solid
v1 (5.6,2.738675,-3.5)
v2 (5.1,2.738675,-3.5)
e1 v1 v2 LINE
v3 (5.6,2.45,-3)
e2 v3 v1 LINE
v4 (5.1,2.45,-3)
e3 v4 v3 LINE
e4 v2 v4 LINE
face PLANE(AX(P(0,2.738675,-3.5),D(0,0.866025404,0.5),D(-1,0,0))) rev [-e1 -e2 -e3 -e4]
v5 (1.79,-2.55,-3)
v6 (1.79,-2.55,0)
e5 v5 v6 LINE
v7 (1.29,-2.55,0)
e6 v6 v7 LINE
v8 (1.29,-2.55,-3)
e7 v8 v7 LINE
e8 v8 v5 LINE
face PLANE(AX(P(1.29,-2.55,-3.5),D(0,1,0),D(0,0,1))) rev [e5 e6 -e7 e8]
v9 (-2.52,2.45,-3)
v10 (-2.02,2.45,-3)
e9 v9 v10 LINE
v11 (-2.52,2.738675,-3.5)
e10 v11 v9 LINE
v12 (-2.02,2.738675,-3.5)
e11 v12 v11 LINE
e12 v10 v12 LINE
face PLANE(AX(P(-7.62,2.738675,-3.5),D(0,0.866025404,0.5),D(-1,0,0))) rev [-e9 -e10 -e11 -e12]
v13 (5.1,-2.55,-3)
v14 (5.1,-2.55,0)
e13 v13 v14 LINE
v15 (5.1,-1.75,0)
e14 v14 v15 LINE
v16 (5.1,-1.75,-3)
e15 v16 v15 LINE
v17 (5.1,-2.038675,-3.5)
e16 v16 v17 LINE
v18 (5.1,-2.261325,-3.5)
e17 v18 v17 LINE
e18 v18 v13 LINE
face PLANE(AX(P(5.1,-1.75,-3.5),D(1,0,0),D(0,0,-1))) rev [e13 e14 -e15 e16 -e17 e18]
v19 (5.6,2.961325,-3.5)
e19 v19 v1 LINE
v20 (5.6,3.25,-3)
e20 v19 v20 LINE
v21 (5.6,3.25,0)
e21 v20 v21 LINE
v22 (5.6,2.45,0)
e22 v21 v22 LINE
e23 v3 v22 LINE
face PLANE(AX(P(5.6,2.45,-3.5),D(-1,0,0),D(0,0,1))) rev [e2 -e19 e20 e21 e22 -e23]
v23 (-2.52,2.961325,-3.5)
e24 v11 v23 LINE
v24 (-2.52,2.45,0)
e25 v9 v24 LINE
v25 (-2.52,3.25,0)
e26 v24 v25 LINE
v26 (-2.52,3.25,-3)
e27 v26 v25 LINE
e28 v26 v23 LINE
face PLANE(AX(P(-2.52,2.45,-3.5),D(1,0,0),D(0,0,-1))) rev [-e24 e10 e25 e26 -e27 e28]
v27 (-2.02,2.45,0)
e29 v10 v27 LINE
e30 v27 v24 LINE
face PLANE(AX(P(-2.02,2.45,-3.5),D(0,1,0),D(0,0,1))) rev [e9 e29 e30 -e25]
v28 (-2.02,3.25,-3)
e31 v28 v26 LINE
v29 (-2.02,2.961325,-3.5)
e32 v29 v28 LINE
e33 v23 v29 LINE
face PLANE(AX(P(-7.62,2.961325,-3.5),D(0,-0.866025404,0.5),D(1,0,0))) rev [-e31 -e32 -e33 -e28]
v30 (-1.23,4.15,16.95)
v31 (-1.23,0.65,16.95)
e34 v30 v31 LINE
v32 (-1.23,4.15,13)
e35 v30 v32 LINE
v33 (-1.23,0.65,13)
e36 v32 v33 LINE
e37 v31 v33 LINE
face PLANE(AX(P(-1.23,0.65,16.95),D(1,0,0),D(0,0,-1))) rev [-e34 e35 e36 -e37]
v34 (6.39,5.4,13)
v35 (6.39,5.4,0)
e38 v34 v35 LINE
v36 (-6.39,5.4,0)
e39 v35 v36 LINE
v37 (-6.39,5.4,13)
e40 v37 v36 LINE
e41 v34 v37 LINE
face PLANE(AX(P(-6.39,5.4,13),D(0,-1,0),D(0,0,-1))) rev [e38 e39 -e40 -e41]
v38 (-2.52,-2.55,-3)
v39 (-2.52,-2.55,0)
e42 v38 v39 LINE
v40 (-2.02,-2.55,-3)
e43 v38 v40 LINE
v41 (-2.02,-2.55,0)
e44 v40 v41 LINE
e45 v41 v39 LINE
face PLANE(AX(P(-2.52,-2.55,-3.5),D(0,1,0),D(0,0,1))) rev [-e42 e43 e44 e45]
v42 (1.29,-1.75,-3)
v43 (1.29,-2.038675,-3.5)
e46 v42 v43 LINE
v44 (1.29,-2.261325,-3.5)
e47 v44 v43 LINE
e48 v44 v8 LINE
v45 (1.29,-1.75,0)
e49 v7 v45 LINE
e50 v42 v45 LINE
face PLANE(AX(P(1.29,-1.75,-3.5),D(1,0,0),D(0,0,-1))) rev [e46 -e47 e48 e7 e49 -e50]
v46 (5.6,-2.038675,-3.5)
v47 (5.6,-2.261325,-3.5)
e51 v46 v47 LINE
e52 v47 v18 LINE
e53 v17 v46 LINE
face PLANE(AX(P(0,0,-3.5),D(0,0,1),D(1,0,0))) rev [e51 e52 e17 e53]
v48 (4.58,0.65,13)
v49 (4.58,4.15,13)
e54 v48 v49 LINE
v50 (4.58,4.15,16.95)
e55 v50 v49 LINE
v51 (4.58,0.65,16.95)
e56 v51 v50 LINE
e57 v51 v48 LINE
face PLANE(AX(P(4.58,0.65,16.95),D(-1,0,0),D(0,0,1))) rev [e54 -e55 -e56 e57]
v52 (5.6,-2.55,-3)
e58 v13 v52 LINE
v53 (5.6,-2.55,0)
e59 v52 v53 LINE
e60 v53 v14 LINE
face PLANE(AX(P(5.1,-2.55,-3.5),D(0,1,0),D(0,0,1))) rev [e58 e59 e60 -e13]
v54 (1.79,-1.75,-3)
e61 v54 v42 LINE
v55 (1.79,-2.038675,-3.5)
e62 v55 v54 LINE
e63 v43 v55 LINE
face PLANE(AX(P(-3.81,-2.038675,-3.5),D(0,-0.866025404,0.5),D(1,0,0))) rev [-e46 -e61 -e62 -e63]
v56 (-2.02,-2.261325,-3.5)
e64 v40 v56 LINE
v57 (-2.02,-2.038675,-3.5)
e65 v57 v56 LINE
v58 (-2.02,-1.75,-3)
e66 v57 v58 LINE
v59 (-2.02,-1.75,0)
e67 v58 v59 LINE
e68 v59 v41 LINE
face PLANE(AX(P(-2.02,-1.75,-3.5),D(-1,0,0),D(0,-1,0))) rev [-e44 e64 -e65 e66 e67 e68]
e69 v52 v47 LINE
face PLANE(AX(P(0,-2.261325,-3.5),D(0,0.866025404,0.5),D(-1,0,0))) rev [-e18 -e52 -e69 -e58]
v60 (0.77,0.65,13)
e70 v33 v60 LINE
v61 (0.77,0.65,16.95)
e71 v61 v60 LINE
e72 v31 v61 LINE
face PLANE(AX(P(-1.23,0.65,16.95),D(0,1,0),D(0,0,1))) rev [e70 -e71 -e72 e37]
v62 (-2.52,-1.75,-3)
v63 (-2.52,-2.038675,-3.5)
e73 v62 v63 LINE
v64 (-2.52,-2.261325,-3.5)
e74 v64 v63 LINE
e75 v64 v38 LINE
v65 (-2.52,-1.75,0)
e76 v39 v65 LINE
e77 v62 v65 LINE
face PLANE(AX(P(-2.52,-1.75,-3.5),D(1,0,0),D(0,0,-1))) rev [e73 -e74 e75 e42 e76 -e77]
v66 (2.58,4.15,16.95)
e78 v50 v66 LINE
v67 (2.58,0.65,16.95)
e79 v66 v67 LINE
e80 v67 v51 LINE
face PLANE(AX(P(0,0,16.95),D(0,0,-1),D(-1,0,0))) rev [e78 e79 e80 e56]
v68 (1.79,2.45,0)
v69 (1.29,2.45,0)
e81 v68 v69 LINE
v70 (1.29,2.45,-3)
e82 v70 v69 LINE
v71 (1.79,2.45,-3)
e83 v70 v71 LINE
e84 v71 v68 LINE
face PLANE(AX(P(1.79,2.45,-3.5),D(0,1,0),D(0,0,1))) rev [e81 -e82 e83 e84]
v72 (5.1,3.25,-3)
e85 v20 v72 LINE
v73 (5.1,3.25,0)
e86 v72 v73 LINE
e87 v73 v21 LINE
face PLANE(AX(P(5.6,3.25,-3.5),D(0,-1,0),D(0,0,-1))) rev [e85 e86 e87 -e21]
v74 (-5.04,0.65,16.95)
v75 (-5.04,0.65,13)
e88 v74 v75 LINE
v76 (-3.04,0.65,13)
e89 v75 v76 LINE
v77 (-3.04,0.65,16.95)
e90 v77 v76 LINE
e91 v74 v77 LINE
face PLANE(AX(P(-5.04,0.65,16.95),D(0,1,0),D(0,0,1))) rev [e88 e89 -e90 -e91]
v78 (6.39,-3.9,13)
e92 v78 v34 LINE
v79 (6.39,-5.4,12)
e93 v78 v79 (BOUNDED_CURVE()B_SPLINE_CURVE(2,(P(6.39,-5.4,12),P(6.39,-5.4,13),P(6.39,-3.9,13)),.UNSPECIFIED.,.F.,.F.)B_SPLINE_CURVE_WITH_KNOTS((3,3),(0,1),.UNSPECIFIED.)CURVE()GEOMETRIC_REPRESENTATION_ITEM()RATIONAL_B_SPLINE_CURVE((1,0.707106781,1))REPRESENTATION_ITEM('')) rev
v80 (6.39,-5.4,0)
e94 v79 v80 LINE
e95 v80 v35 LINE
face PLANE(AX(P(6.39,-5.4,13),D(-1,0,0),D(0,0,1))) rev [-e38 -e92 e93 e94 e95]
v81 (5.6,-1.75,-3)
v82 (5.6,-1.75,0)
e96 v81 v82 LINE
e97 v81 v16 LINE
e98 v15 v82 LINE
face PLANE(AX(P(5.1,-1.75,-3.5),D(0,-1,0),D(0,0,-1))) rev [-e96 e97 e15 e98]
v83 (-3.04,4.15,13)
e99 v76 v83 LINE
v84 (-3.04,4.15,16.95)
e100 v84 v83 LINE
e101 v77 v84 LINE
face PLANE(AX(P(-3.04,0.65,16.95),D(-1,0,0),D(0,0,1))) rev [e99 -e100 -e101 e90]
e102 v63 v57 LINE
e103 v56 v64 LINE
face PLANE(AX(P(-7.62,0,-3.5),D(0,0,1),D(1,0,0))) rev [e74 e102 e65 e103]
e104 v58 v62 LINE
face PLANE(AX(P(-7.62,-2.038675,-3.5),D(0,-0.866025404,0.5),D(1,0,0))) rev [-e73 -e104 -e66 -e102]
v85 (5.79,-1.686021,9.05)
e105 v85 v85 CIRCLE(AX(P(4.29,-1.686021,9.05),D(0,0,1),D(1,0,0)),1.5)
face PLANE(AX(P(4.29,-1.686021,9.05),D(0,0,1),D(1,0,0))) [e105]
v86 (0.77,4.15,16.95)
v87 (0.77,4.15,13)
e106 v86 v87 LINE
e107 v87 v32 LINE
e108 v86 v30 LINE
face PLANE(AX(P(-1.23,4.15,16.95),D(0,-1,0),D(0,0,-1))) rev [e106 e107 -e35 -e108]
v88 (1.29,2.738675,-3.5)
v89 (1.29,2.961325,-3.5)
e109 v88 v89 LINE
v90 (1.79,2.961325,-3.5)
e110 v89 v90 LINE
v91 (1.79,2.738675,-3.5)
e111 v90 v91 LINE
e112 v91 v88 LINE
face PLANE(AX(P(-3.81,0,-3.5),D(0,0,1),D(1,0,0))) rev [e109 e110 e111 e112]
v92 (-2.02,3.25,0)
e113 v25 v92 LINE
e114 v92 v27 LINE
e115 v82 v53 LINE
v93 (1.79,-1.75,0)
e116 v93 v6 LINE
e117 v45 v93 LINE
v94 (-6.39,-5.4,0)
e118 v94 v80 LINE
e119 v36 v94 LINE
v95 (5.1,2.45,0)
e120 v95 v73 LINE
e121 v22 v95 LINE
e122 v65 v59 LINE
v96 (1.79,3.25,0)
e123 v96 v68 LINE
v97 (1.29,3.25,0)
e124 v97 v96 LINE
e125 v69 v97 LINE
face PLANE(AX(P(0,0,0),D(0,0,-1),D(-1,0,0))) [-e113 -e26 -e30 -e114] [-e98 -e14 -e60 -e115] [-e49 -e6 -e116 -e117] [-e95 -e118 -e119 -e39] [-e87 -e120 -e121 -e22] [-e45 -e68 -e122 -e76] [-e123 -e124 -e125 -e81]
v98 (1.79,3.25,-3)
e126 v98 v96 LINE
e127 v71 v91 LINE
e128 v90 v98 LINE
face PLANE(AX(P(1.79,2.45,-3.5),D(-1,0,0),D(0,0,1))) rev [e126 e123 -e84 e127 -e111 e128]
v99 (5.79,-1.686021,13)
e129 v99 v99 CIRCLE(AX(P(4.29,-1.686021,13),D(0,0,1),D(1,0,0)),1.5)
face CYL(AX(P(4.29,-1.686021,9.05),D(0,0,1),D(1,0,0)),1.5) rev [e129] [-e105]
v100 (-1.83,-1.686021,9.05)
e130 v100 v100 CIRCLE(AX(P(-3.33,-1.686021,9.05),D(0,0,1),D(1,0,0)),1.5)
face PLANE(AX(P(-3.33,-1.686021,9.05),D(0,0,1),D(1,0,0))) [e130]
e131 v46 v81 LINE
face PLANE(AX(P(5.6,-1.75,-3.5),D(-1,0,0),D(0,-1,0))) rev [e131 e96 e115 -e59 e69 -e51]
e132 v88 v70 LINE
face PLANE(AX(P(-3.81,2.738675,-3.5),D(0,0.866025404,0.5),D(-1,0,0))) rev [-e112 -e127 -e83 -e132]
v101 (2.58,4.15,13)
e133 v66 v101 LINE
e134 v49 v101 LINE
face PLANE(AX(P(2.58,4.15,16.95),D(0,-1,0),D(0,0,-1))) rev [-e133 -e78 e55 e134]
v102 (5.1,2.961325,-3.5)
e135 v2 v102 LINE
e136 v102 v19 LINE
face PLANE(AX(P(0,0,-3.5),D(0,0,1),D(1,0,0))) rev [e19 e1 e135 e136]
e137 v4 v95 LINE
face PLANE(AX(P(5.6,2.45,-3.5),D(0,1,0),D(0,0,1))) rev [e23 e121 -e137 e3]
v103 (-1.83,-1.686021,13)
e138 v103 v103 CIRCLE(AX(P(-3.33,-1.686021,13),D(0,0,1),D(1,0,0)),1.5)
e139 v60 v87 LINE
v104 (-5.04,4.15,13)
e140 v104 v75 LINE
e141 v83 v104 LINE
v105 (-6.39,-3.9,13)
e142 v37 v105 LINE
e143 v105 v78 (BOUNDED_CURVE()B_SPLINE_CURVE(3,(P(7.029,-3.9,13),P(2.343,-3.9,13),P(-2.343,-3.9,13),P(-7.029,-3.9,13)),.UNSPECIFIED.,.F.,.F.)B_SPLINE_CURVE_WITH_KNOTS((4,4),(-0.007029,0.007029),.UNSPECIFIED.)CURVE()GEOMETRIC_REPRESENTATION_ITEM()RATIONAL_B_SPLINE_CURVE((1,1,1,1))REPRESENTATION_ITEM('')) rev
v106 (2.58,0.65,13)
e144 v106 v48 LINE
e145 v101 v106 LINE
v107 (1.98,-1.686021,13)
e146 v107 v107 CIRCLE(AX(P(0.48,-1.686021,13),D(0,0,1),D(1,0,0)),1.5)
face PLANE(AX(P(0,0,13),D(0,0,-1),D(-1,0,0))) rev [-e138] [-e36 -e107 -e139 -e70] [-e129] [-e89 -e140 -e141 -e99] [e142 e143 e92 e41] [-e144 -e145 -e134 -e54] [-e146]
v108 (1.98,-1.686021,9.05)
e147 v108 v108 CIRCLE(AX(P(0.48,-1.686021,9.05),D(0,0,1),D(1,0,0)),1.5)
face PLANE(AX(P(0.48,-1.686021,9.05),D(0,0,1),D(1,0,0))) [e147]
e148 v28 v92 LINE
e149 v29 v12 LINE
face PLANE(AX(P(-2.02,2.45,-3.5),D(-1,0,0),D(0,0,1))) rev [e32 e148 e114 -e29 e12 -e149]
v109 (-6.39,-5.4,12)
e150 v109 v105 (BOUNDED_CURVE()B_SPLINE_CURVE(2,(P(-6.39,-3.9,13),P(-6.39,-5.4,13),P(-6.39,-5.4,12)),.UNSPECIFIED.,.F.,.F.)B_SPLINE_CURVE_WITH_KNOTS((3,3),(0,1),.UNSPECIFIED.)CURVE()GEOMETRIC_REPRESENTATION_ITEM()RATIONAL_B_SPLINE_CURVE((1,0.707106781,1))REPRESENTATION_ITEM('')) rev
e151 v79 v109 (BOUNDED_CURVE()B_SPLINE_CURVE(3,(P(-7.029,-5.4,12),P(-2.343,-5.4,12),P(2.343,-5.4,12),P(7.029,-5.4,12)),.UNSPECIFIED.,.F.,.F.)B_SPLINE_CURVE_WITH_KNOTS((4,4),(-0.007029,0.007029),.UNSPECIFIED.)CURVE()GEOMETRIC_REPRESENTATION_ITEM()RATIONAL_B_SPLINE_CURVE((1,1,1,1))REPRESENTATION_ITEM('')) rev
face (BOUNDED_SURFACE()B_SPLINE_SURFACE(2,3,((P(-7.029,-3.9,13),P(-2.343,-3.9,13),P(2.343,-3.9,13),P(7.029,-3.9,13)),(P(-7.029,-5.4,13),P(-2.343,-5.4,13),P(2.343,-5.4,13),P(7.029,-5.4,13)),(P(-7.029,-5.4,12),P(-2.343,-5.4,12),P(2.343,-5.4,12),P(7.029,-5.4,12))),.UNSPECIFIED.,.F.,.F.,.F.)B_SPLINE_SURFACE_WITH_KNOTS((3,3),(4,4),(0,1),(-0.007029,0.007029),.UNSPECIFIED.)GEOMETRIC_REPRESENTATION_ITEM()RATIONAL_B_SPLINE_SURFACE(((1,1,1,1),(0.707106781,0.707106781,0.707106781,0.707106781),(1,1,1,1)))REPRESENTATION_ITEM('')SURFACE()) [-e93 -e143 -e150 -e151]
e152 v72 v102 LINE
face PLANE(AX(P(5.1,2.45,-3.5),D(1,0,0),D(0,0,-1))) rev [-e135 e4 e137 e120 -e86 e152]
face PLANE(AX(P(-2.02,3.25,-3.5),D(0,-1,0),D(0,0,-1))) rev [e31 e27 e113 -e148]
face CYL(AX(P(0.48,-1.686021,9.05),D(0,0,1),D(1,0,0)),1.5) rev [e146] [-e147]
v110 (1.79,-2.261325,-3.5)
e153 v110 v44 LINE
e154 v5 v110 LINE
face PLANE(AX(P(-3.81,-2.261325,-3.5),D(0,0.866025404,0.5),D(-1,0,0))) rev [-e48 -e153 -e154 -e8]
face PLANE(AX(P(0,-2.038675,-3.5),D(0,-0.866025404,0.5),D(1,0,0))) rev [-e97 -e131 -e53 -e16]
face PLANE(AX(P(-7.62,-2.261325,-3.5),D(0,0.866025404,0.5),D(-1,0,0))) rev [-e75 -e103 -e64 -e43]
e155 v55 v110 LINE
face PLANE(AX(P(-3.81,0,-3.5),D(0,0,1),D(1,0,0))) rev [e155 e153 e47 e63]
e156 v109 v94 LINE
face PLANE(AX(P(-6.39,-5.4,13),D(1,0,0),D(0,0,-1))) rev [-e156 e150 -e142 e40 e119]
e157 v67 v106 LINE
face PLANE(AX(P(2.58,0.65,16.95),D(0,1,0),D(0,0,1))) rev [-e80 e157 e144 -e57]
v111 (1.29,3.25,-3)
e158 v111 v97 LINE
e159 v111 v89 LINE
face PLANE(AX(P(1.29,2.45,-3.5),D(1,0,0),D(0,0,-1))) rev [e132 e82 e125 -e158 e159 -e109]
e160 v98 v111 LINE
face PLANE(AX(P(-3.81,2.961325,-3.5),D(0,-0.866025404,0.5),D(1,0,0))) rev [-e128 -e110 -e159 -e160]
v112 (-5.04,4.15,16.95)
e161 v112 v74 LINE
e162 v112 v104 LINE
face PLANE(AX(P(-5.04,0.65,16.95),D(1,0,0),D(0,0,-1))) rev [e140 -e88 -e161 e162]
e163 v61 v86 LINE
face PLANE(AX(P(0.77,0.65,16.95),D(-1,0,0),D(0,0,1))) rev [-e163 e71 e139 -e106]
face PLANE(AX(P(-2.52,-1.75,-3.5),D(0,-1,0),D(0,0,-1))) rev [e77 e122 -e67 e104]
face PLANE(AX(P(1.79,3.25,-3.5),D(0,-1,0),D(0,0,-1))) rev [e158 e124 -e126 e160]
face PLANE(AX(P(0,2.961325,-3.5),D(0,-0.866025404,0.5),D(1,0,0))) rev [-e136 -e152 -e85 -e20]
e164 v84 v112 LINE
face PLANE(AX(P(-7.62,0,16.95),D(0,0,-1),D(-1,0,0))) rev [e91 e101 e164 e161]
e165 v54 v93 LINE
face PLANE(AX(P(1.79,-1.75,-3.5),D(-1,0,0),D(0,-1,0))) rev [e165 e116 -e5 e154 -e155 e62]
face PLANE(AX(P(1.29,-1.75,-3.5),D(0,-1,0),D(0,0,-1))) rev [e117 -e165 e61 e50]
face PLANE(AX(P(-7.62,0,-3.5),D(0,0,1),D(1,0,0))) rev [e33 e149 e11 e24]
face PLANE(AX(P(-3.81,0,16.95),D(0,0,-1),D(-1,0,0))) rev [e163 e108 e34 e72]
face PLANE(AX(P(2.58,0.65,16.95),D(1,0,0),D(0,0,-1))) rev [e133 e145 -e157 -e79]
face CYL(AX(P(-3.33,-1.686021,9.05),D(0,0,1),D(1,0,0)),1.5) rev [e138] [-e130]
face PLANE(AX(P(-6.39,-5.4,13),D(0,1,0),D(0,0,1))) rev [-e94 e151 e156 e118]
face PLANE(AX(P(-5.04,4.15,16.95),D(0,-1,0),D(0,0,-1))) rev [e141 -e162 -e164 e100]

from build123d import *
from OCP.BRepFilletAPI import BRepFilletAPI_MakeChamfer

# Parameters (mm, degrees)
SKETCH_1_W                          = 12.78
SKETCH_1_H                          = 10.8
EXTRUDE_1_DEPTH                     = 13
FILLET_1_SIZE                       = 1
FILLET_1_SIZE_2                     = 1.5
SKETCH_2_W                          = 2
SKETCH_2_H                          = 3.5
EXTRUDE_2_DEPTH                     = 3.95
SKETCH_3_R                          = 1.5
CUT_EXTRUDE_1_DEPTH                 = 3.95
SKETCH_4_W                          = 0.5
SKETCH_4_H                          = 0.8
EXTRUDE_3_DEPTH                     = 3.5
CHAMFER_1_SIZE                      = 0.5
CHAMFER_1_SIZE2                     = 0.288675135
PATTERN_LINEAR_2_COUNT              = 3
PATTERN_LINEAR_2_PITCH              = 3.81
CHAMFER_1_OF_PATTERN_LINEAR_2_SIZE  = 0.5
CHAMFER_1_OF_PATTERN_LINEAR_2_SIZE2 = 0.288675135


with BuildPart() as part:
    # Эскиз1 → Бобышка-Вытянуть1 (new body)
    with BuildSketch(Plane.XY):
        Rectangle(SKETCH_1_W, SKETCH_1_H)
    extrude(amount=EXTRUDE_1_DEPTH)

    # Скругление1
    # an asymmetric fillet: 1.5, 1 mm, written as the material it takes off along each edge
    with BuildSketch(Plane(origin=(-10.14, -5.4, 13), x_dir=(0, 0, -1), z_dir=(1, 0, 0))) as fillet_1_piece_1:
        with BuildLine():
            Bezier((FILLET_1_SIZE, 0), (0, 0), (0, FILLET_1_SIZE_2), weights=[1, 0.707106781, 1])
            Line((0, FILLET_1_SIZE_2), (0, 0))
            Line((0, 0), (FILLET_1_SIZE, 0))
        make_face()
    extrude(amount=20.28, mode=Mode.SUBTRACT)

    # Эскиз2 → Бобышка-Вытянуть2 (add)
    with BuildSketch(Plane.XY.offset(13)):
        with Locations((3.58, 2.4)):
            Rectangle(SKETCH_2_W, SKETCH_2_H)
    extrude_2 = extrude(amount=EXTRUDE_2_DEPTH)

    # Эскиз3 → Вырез-Вытянуть1 (cut)
    with BuildSketch(Plane.XY.offset(13)):
        with Locations((4.29, -1.686021073)):
            Circle(SKETCH_3_R)
    cut_extrude_1 = extrude(amount=-CUT_EXTRUDE_1_DEPTH, mode=Mode.SUBTRACT)

    # Эскиз4 → Бобышка-Вытянуть3 (add)
    with BuildSketch(Plane(origin=(0, 0, 0), x_dir=(-1, 0, 0), z_dir=(0, 0, -1))):
        with Locations((-5.35, 2.85)):
            Rectangle(SKETCH_4_W, SKETCH_4_H)
        with Locations((-5.35, -2.15)):
            Rectangle(SKETCH_4_W, SKETCH_4_H)
    extrude_3 = extrude(amount=EXTRUDE_3_DEPTH)

    # Фаска1: one chamfer whose edges measure the first distance from different faces: ONE call of the kernel's chamfer builder (chamfer() names one face for all edges)
    chamfer_1_edges_1 = [part.edges().sort_by_distance(p)[0] for p in [
        (5.35, 3.25, -3.5),
    ]]
    chamfer_1_side_1 = [part.faces().sort_by_distance(p)[0] for p in [
        (5.35, 3.25, -1.75),
    ]]
    chamfer_1_edges_2 = [part.edges().sort_by_distance(p)[0] for p in [
        (5.35, 2.45, -3.5),
    ]]
    chamfer_1_side_2 = [part.faces().sort_by_distance(p)[0] for p in [
        (5.35, 2.45, -1.75),
    ]]
    chamfer_1_edges_3 = [part.edges().sort_by_distance(p)[0] for p in [
        (5.35, -2.55, -3.5),
    ]]
    chamfer_1_side_3 = [part.faces().sort_by_distance(p)[0] for p in [
        (5.35, -2.55, -1.75),
    ]]
    chamfer_1_edges_4 = [part.edges().sort_by_distance(p)[0] for p in [
        (5.35, -1.75, -3.5),
    ]]
    chamfer_1_side_4 = [part.faces().sort_by_distance(p)[0] for p in [
        (5.35, -1.75, -1.75),
    ]]
    chamfer_1 = BRepFilletAPI_MakeChamfer(part.part.solid().wrapped)
    for e in chamfer_1_edges_1:
        chamfer_1.Add(CHAMFER_1_SIZE, CHAMFER_1_SIZE2, e.wrapped, chamfer_1_side_1[0].wrapped)  # the first distance lies on this face
    for e in chamfer_1_edges_2:
        chamfer_1.Add(CHAMFER_1_SIZE, CHAMFER_1_SIZE2, e.wrapped, chamfer_1_side_2[0].wrapped)  # the first distance lies on this face
    for e in chamfer_1_edges_3:
        chamfer_1.Add(CHAMFER_1_SIZE, CHAMFER_1_SIZE2, e.wrapped, chamfer_1_side_3[0].wrapped)  # the first distance lies on this face
    for e in chamfer_1_edges_4:
        chamfer_1.Add(CHAMFER_1_SIZE, CHAMFER_1_SIZE2, e.wrapped, chamfer_1_side_4[0].wrapped)  # the first distance lies on this face
    add(Compound.cast(chamfer_1.Shape()), mode=Mode.REPLACE)

    # Линейный массив2: Бобышка-Вытянуть2, Вырез-Вытянуть1, Бобышка-Вытянуть3 ×3
    with Locations(*[(-i * PATTERN_LINEAR_2_PITCH, 0, 0) for i in range(1, PATTERN_LINEAR_2_COUNT)]):
        add(extrude_2)
        add(cut_extrude_1, mode=Mode.SUBTRACT)
        add(extrude_3)

    # Фаска1 of Линейный массив2: one chamfer whose edges measure the first distance from different faces: ONE call of the kernel's chamfer builder (chamfer() names one face for all edges)
    chamfer_1_of_pattern_linear_2_edges_1 = [part.edges().sort_by_distance(p)[0] for p in [
        (1.54, 3.25, -3.5),
    ]]
    chamfer_1_of_pattern_linear_2_side_1 = [part.faces().sort_by_distance(p)[0] for p in [
        (1.54, 3.25, -1.75),
    ]]
    chamfer_1_of_pattern_linear_2_edges_2 = [part.edges().sort_by_distance(p)[0] for p in [
        (1.54, 2.45, -3.5),
    ]]
    chamfer_1_of_pattern_linear_2_side_2 = [part.faces().sort_by_distance(p)[0] for p in [
        (1.54, 2.45, -1.75),
    ]]
    chamfer_1_of_pattern_linear_2_edges_3 = [part.edges().sort_by_distance(p)[0] for p in [
        (1.54, -2.55, -3.5),
    ]]
    chamfer_1_of_pattern_linear_2_side_3 = [part.faces().sort_by_distance(p)[0] for p in [
        (1.54, -2.55, -1.75),
    ]]
    chamfer_1_of_pattern_linear_2_edges_4 = [part.edges().sort_by_distance(p)[0] for p in [
        (1.54, -1.75, -3.5),
    ]]
    chamfer_1_of_pattern_linear_2_side_4 = [part.faces().sort_by_distance(p)[0] for p in [
        (1.54, -1.75, -1.75),
    ]]
    chamfer_1_of_pattern_linear_2_edges_5 = [part.edges().sort_by_distance(p)[0] for p in [
        (-2.27, 3.25, -3.5),
    ]]
    chamfer_1_of_pattern_linear_2_side_5 = [part.faces().sort_by_distance(p)[0] for p in [
        (-2.27, 3.25, -1.75),
    ]]
    chamfer_1_of_pattern_linear_2_edges_6 = [part.edges().sort_by_distance(p)[0] for p in [
        (-2.27, 2.45, -3.5),
    ]]
    chamfer_1_of_pattern_linear_2_side_6 = [part.faces().sort_by_distance(p)[0] for p in [
        (-2.27, 2.45, -1.75),
    ]]
    chamfer_1_of_pattern_linear_2_edges_7 = [part.edges().sort_by_distance(p)[0] for p in [
        (-2.27, -2.55, -3.5),
    ]]
    chamfer_1_of_pattern_linear_2_side_7 = [part.faces().sort_by_distance(p)[0] for p in [
        (-2.27, -2.55, -1.75),
    ]]
    chamfer_1_of_pattern_linear_2_edges_8 = [part.edges().sort_by_distance(p)[0] for p in [
        (-2.27, -1.75, -3.5),
    ]]
    chamfer_1_of_pattern_linear_2_side_8 = [part.faces().sort_by_distance(p)[0] for p in [
        (-2.27, -1.75, -1.75),
    ]]
    chamfer_1_of_pattern_linear_2 = BRepFilletAPI_MakeChamfer(part.part.solid().wrapped)
    for e in chamfer_1_of_pattern_linear_2_edges_1:
        chamfer_1_of_pattern_linear_2.Add(CHAMFER_1_OF_PATTERN_LINEAR_2_SIZE, CHAMFER_1_OF_PATTERN_LINEAR_2_SIZE2, e.wrapped, chamfer_1_of_pattern_linear_2_side_1[0].wrapped)  # the first distance lies on this face
    for e in chamfer_1_of_pattern_linear_2_edges_2:
        chamfer_1_of_pattern_linear_2.Add(CHAMFER_1_OF_PATTERN_LINEAR_2_SIZE, CHAMFER_1_OF_PATTERN_LINEAR_2_SIZE2, e.wrapped, chamfer_1_of_pattern_linear_2_side_2[0].wrapped)  # the first distance lies on this face
    for e in chamfer_1_of_pattern_linear_2_edges_3:
        chamfer_1_of_pattern_linear_2.Add(CHAMFER_1_OF_PATTERN_LINEAR_2_SIZE, CHAMFER_1_OF_PATTERN_LINEAR_2_SIZE2, e.wrapped, chamfer_1_of_pattern_linear_2_side_3[0].wrapped)  # the first distance lies on this face
    for e in chamfer_1_of_pattern_linear_2_edges_4:
        chamfer_1_of_pattern_linear_2.Add(CHAMFER_1_OF_PATTERN_LINEAR_2_SIZE, CHAMFER_1_OF_PATTERN_LINEAR_2_SIZE2, e.wrapped, chamfer_1_of_pattern_linear_2_side_4[0].wrapped)  # the first distance lies on this face
    for e in chamfer_1_of_pattern_linear_2_edges_5:
        chamfer_1_of_pattern_linear_2.Add(CHAMFER_1_OF_PATTERN_LINEAR_2_SIZE, CHAMFER_1_OF_PATTERN_LINEAR_2_SIZE2, e.wrapped, chamfer_1_of_pattern_linear_2_side_5[0].wrapped)  # the first distance lies on this face
    for e in chamfer_1_of_pattern_linear_2_edges_6:
        chamfer_1_of_pattern_linear_2.Add(CHAMFER_1_OF_PATTERN_LINEAR_2_SIZE, CHAMFER_1_OF_PATTERN_LINEAR_2_SIZE2, e.wrapped, chamfer_1_of_pattern_linear_2_side_6[0].wrapped)  # the first distance lies on this face
    for e in chamfer_1_of_pattern_linear_2_edges_7:
        chamfer_1_of_pattern_linear_2.Add(CHAMFER_1_OF_PATTERN_LINEAR_2_SIZE, CHAMFER_1_OF_PATTERN_LINEAR_2_SIZE2, e.wrapped, chamfer_1_of_pattern_linear_2_side_7[0].wrapped)  # the first distance lies on this face
    for e in chamfer_1_of_pattern_linear_2_edges_8:
        chamfer_1_of_pattern_linear_2.Add(CHAMFER_1_OF_PATTERN_LINEAR_2_SIZE, CHAMFER_1_OF_PATTERN_LINEAR_2_SIZE2, e.wrapped, chamfer_1_of_pattern_linear_2_side_8[0].wrapped)  # the first distance lies on this face
    add(Compound.cast(chamfer_1_of_pattern_linear_2.Shape()), mode=Mode.REPLACE)


solid = part.part
